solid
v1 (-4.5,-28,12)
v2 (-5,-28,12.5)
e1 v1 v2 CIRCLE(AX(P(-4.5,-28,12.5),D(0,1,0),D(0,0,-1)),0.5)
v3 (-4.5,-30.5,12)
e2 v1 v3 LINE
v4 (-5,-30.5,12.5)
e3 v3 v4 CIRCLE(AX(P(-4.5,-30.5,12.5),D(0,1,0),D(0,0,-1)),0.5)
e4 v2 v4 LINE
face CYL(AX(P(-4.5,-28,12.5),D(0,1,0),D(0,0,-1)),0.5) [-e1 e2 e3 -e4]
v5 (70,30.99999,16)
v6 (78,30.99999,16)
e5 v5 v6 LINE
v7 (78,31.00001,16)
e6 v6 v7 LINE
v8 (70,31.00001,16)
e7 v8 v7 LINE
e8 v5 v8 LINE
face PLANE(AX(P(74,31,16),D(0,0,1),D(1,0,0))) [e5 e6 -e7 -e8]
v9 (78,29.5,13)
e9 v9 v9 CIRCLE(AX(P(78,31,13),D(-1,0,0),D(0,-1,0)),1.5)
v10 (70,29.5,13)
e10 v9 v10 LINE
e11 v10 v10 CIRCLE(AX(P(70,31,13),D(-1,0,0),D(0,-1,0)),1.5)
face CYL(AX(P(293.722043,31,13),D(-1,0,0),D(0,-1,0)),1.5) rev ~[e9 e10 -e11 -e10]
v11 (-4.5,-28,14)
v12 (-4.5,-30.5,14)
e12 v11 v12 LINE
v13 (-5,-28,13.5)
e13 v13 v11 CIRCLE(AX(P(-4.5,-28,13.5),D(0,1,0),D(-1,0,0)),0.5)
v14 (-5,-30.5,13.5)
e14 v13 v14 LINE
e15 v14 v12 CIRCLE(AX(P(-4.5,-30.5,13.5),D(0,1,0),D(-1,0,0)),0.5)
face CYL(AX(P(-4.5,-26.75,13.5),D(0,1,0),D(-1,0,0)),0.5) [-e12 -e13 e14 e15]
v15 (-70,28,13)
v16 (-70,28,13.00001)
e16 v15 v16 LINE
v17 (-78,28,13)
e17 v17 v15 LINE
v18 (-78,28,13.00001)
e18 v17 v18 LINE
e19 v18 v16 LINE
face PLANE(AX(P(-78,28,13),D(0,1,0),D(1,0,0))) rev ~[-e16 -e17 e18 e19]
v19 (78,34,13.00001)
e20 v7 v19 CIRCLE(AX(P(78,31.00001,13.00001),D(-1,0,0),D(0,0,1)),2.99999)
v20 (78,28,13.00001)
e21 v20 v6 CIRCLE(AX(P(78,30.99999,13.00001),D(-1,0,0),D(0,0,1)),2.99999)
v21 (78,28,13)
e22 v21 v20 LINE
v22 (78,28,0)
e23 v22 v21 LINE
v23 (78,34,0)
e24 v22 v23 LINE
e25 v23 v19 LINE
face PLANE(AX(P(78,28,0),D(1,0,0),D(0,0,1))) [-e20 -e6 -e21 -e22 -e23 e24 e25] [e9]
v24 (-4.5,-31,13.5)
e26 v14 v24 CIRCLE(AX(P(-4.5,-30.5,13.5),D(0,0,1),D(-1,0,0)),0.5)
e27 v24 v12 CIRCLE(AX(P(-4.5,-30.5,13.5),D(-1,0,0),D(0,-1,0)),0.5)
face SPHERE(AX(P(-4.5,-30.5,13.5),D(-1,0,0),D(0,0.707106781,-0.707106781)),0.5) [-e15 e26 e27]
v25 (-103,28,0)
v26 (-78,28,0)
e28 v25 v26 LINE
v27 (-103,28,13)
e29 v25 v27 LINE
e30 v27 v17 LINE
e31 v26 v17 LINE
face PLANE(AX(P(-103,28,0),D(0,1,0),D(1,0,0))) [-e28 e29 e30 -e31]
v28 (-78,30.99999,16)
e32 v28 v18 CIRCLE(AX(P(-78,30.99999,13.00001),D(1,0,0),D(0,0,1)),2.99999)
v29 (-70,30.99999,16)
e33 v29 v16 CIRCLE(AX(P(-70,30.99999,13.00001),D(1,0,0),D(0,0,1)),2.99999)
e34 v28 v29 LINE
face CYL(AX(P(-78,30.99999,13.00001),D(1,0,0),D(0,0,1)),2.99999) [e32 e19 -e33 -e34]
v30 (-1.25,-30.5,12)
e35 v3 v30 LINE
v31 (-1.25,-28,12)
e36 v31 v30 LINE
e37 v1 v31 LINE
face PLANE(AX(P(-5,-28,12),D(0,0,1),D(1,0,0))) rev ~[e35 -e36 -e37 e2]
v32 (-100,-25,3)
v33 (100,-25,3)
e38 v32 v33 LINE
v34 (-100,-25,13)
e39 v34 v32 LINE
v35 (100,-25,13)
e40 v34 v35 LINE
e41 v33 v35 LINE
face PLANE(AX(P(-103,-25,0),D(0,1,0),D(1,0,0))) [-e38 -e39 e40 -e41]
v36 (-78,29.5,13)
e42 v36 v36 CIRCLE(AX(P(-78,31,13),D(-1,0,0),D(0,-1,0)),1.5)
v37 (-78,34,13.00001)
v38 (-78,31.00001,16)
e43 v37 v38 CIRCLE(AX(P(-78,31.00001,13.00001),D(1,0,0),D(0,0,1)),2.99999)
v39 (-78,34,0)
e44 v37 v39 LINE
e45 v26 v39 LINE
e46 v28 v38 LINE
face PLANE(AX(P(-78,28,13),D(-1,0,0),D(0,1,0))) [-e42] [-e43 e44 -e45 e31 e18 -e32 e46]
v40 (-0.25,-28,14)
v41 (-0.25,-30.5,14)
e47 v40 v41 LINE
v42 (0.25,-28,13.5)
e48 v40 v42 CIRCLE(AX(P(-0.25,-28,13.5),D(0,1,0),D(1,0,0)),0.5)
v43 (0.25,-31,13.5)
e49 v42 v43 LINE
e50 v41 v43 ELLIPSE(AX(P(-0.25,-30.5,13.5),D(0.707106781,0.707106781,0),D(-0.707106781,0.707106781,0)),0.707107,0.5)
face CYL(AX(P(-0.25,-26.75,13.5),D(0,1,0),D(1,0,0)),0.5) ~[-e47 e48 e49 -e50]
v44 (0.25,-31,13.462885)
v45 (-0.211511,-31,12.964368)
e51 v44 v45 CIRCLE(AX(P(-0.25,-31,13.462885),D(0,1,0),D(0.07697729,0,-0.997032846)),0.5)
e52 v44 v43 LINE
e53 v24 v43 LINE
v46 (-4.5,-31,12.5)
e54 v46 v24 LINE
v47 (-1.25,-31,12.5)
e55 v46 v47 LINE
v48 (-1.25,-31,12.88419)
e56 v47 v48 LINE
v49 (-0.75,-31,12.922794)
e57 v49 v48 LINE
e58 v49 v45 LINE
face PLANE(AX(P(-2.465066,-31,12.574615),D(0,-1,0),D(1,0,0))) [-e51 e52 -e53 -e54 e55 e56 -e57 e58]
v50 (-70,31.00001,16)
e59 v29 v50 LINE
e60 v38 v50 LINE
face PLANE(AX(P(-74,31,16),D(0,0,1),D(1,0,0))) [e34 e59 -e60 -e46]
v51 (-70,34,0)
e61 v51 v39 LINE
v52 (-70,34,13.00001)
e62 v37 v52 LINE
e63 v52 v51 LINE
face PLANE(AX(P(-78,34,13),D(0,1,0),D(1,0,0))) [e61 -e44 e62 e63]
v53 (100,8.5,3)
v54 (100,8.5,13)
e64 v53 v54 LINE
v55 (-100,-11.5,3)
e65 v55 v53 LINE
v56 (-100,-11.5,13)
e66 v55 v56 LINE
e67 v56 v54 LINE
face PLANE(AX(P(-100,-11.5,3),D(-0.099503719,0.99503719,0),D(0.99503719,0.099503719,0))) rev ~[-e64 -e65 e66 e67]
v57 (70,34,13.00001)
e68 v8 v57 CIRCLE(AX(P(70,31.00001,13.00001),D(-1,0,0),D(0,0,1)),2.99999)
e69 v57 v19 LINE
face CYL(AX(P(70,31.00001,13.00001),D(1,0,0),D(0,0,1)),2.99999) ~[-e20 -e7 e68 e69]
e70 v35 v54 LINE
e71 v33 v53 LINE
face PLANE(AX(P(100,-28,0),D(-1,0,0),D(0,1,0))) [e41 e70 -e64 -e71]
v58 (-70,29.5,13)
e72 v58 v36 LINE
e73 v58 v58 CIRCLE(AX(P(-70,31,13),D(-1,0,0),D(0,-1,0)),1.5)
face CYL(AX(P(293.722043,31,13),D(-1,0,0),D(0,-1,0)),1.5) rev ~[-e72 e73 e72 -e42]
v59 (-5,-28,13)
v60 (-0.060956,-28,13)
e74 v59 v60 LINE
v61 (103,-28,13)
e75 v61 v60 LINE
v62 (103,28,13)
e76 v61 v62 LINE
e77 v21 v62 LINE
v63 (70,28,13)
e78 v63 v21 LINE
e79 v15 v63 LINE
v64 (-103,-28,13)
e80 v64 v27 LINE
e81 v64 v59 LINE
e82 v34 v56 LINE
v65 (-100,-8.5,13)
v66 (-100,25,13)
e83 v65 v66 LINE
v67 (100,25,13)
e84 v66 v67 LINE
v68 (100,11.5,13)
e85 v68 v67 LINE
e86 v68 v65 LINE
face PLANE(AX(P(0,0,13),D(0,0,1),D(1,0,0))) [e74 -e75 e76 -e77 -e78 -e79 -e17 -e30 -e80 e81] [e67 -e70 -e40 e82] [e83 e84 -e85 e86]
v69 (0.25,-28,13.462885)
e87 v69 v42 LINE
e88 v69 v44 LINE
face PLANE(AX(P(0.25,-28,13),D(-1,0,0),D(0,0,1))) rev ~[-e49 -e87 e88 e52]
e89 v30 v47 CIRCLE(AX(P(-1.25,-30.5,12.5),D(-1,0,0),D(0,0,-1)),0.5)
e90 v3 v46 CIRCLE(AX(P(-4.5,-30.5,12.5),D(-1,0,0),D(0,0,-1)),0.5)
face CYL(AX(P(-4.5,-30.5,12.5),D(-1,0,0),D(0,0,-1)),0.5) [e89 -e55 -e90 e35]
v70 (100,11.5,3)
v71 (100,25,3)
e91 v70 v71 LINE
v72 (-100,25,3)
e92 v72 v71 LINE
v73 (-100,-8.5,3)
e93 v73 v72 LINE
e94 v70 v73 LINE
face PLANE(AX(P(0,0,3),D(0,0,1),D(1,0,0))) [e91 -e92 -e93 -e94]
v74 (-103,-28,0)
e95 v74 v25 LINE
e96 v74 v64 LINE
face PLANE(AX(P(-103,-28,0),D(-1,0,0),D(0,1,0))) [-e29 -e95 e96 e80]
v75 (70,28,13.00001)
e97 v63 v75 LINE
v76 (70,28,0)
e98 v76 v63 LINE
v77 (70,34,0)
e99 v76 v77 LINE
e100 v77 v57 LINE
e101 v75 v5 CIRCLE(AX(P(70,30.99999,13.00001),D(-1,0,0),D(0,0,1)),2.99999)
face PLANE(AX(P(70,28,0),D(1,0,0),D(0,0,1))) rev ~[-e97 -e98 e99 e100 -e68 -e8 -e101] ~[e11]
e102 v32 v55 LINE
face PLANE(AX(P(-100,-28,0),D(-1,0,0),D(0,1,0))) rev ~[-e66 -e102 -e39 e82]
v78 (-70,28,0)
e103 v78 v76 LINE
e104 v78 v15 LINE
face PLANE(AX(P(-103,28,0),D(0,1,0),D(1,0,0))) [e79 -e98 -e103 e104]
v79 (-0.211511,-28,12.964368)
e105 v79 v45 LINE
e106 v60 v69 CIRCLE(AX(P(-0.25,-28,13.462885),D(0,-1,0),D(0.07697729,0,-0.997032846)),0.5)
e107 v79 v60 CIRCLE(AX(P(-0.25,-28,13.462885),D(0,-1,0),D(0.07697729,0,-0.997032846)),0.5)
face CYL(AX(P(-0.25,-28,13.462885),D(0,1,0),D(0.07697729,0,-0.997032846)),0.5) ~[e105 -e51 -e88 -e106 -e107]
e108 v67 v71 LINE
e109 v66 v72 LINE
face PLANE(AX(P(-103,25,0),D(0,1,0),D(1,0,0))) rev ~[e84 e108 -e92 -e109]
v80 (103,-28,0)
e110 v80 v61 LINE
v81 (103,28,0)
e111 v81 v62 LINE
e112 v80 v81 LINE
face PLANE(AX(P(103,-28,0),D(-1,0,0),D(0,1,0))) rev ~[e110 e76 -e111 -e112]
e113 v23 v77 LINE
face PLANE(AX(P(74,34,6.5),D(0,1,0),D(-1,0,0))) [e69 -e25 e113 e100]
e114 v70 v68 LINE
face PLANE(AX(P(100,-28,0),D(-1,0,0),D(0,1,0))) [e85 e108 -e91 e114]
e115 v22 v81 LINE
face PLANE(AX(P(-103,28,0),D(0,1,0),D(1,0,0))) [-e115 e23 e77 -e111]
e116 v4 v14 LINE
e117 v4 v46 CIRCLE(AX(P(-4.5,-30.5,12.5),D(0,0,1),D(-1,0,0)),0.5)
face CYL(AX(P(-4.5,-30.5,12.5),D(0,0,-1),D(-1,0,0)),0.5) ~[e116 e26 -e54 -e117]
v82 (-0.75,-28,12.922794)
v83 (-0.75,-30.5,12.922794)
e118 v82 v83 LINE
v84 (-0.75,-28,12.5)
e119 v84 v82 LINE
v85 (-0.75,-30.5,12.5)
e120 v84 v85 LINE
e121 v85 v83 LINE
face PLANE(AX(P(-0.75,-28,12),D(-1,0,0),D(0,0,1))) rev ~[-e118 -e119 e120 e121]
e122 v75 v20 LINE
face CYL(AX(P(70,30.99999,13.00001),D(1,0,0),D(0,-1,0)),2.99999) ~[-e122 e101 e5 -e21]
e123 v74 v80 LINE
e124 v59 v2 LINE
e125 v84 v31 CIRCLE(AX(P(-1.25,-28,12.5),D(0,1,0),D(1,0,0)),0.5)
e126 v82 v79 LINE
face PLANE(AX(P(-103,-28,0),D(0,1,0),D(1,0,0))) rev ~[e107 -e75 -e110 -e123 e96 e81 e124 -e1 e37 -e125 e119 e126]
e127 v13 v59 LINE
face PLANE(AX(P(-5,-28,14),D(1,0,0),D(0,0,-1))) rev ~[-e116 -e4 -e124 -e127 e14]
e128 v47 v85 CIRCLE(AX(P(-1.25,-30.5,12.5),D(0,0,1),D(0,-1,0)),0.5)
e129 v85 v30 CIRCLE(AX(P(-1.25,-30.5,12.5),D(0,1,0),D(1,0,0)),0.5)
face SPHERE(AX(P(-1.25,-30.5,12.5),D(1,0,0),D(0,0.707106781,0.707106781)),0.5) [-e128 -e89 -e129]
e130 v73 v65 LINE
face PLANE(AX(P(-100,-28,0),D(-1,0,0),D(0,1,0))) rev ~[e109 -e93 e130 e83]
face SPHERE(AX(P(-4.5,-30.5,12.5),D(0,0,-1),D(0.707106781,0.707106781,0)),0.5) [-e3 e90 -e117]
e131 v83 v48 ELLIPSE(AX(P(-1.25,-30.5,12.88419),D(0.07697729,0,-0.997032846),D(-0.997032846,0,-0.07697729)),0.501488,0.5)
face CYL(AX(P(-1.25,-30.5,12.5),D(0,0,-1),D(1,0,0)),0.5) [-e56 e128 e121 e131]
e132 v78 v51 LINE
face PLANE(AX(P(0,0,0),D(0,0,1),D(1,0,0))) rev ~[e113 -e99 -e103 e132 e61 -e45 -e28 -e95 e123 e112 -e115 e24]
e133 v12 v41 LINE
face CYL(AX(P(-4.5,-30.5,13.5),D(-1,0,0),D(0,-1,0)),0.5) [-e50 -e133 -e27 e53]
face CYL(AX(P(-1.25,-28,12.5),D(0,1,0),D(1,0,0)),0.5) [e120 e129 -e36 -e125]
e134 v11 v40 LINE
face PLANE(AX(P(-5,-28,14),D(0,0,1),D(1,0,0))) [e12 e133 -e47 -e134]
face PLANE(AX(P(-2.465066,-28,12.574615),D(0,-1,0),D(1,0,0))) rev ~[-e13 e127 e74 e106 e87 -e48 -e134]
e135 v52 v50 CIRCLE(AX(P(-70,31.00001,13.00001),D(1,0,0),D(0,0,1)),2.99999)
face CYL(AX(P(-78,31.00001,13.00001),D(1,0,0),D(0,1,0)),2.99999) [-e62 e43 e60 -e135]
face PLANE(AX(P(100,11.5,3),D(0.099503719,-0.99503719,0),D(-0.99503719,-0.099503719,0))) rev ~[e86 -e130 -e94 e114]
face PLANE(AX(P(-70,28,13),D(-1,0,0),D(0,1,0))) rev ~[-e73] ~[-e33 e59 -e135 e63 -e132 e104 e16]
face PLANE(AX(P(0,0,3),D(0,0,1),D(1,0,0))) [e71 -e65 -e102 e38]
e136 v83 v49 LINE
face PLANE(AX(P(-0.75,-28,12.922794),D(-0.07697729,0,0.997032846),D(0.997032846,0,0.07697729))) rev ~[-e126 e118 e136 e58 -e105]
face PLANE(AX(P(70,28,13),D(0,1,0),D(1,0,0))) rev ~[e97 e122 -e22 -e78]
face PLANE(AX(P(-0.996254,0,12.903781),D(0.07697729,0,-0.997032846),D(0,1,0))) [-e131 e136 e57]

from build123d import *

# Parameters (mm, degrees)
F0_W          = 206
F0_H          = 56
F1_DEPTH      = 13
F2_T          = -3
F4_DEPTH      = 10
F5_W          = 8
F5_H          = 13
F6_DEPTH      = 6
F7_W          = 8
F7_H          = 6
F8_DEPTH      = 3
F9_R          = 2.99999
F11_D         = 3
F12_W         = 5.25
F12_H         = 1
F13_DEPTH     = 3
F14_T1_DEPTH  = 5.5
F14_T3_DEPTH  = 4.1572120132
F14_T5_DEPTH  = 3.75
F14_T7_DEPTH  = 6
F14_T9_DEPTH  = 3.25
F14_T11_DEPTH = 2.5
F14_T13_DEPTH = 1
F14_S17_W     = 0.5
F14_S17_H     = 0.5
F14_T18_DEPTH = 0.5
F14_S23_W     = 0.5
F14_S23_H     = 0.5
F14_T24_DEPTH = 0.5
F14_S29_W     = 0.5
F14_S29_H     = 0.5
F14_T30_DEPTH = 0.5
F14_T36_DEPTH = 1.6727936268


# Not quite as in the source:
# - a fillet or chamfer that OpenCascade refuses, or shapes differently, is made with other operations: its cross-section is extruded or revolved along the edge and cut away or added
# - a fillet or chamfer is up to 0.001 mm smaller than in the source, because OpenCascade refuses the exact size


with BuildPart() as f1:
    # F0 (on Top) → F1 (new body)
    with BuildSketch(Plane.XY):
        Rectangle(F0_W, F0_H)
    extrude(amount=F1_DEPTH)

    # F2
    f2_openings = [f1.faces().sort_by_distance(p)[0] for p in [
        (0, 0, 13),
    ]]
    offset(amount=F2_T, openings=f2_openings)

    # F3 (on face) → F4 (join)
    with BuildSketch(Plane.XY.offset(3)):
        Polygon((100, 11.5), (-100, -8.5), (-100, -11.5), (100, 8.5), align=None)
    extrude(amount=F4_DEPTH)

    # F5 (on face) → F6 (join)
    with BuildSketch(Plane(origin=(0, 28, 0), x_dir=(-1, 0, 0), z_dir=(0, 1, 0))):
        with Locations((-74, 6.5)):
            Rectangle(F5_W, F5_H)
        with Locations((74, 6.5)):
            Rectangle(F5_W, F5_H)
    extrude(amount=F6_DEPTH)

    # F7 (on face) → F8 (join)
    with BuildSketch(Plane.XY.offset(13)):
        with Locations((-74, 31)):
            Rectangle(F7_W, F7_H)
        with Locations((74, 31)):
            Rectangle(F7_W, F7_H)
    extrude(amount=F8_DEPTH)

    # F9 (radius 3 in the source; OpenCascade refuses exactly that, so slightly less here)
    f9_edges = [f1.edges().sort_by_distance(p)[0] for p in [
        (-74, 28, 16),
        (-74, 34, 16),
        (74, 34, 16),
        (74, 28, 16),
    ]]
    fillet(f9_edges, radius=F9_R)

    # F11 (through all)
    with Locations(Plane.YZ.offset(78)):
        with Locations((31, 13)):
            Hole(F11_D / 2)

    # F12 (on face) → F13 (join)
    with BuildSketch(Plane.XZ.offset(28)):
        Polygon((-0.75, 12.9227936268), (0.25, 13), (-5, 13), (-5, 12), (-0.75, 12), align=None)
        with Locations((-2.375, 13.5)):
            Rectangle(F12_W, F12_H)
    extrude(amount=F13_DEPTH)

    # F14: fillet of radius 0.5 on 9 edges, made by hand

    # F14_s2 → F14_t1 (cut)
    with BuildSketch(Plane.XZ.offset(26.75)):
        with BuildLine():
            ThreePointArc((0.25, 13.5), (0.1035533906, 13.8535533906), (-0.25, 14))
            Line((-0.25, 14), (0.25, 14))
            Line((0.25, 14), (0.25, 13.5))
        make_face()
    extrude(amount=F14_T1_DEPTH, mode=Mode.SUBTRACT)

    # F14_s4 → F14_t3 (cut)
    with BuildSketch(Plane.XZ.offset(28)):
        with BuildLine():
            ThreePointArc((-0.211511355, 12.9643683821), (0.1169089277, 13.1232116701), (0.25, 13.4628848053))
            Line((0.25, 13.4628848053), (0.25, 13))
            Line((0.25, 13), (-0.211511355, 12.9643683821))
        make_face()
    extrude(amount=F14_T3_DEPTH, mode=Mode.SUBTRACT)

    # F14_s6 → F14_t5 (cut)
    with BuildSketch(Plane.XZ.offset(26.75)):
        with BuildLine():
            ThreePointArc((-5, 13.5), (-4.8535533906, 13.8535533906), (-4.5, 14))
            Line((-4.5, 14), (-5, 14))
            Line((-5, 14), (-5, 13.5))
        make_face()
    extrude(amount=F14_T5_DEPTH, mode=Mode.SUBTRACT)

    # F14_s8 → F14_t7 (cut)
    with BuildSketch(Plane.YZ.offset(-4.5)):
        with BuildLine():
            ThreePointArc((-31, 13.5), (-30.8535533906, 13.8535533906), (-30.5, 14))
            Line((-30.5, 14), (-31, 14))
            Line((-31, 14), (-31, 13.5))
        make_face()
    extrude(amount=F14_T7_DEPTH, mode=Mode.SUBTRACT)

    # F14_s10 → F14_t9 (cut)
    with BuildSketch(Plane.YZ.offset(-4.5)):
        with BuildLine():
            ThreePointArc((-30.5, 12), (-30.8535533906, 12.1464466094), (-31, 12.5))
            Line((-31, 12.5), (-31, 12))
            Line((-31, 12), (-30.5, 12))
        make_face()
    extrude(amount=F14_T9_DEPTH, mode=Mode.SUBTRACT)

    # F14_s12 → F14_t11 (cut)
    with BuildSketch(Plane.XZ.offset(28)):
        with BuildLine():
            ThreePointArc((-0.75, 12.5), (-0.8964466094, 12.1464466094), (-1.25, 12))
            Line((-1.25, 12), (-0.75, 12))
            Line((-0.75, 12), (-0.75, 12.5))
        make_face()
        with BuildLine():
            ThreePointArc((-4.5, 12), (-4.8535533906, 12.1464466094), (-5, 12.5))
            Line((-5, 12.5), (-5, 12))
            Line((-5, 12), (-4.5, 12))
        make_face()
    extrude(amount=F14_T11_DEPTH, mode=Mode.SUBTRACT)

    # F14_s14 → F14_t13 (cut)
    with BuildSketch(Plane.XY.offset(12.5)):
        with BuildLine():
            ThreePointArc((-5, -30.5), (-4.8535533906, -30.8535533906), (-4.5, -31))
            Line((-4.5, -31), (-5, -31))
            Line((-5, -31), (-5, -30.5))
        make_face()
    extrude(amount=F14_T13_DEPTH, mode=Mode.SUBTRACT)


with BuildPart() as f14_tool16:
    # F14_s17 → F14_t18 (new body)
    with BuildSketch(Plane.YZ.offset(-4.5)):
        with Locations((-30.75, 13.75)):
            Rectangle(F14_S17_W, F14_S17_H)
    extrude(amount=-F14_T18_DEPTH)

    # F14_s19 → F14_t20 (revolve, cut)
    with BuildSketch(Plane(origin=(-4.5, -30.5, 13.5), x_dir=(0, 0.7071067812, -0.7071067812), z_dir=(0, 0.7071067812, 0.7071067812))):
        with BuildLine():
            ThreePointArc((0, -0.5), (0.5, 0), (0, 0.5))
            Line((0, 0.5), (0, -0.5))
        make_face()
    revolve(axis=Axis((-4.5, -30.5, 13.5), (-1, 0, 0)), mode=Mode.SUBTRACT)


with BuildPart() as f1_1:
    add(f1.part)

    # F14_t15: cut F14_tool16
    add(f14_tool16.part, mode=Mode.SUBTRACT)


with BuildPart() as f14_tool22:
    # F14_s23 → F14_t24 (new body)
    with BuildSketch(Plane.XY.offset(12.5)):
        with Locations((-4.75, -30.75)):
            Rectangle(F14_S23_W, F14_S23_H)
    extrude(amount=-F14_T24_DEPTH)

    # F14_s25 → F14_t26 (revolve, cut)
    with BuildSketch(Plane(origin=(-4.5, -30.5, 12.5), x_dir=(0.7071067812, 0.7071067812, 0), z_dir=(-0.7071067812, 0.7071067812, 0))):
        with BuildLine():
            ThreePointArc((0, -0.5), (0.5, 0), (0, 0.5))
            Line((0, 0.5), (0, -0.5))
        make_face()
    revolve(axis=Axis((-4.5, -30.5, 12.5), (0, 0, -1)), mode=Mode.SUBTRACT)


with BuildPart() as f1_2:
    add(f1_1.part)

    # F14_t21: cut F14_tool22
    add(f14_tool22.part, mode=Mode.SUBTRACT)


with BuildPart() as f14_tool28:
    # F14_s29 → F14_t30 (new body)
    with BuildSketch(Plane.YZ.offset(-1.25)):
        with Locations((-30.75, 12.25)):
            Rectangle(F14_S29_W, F14_S29_H)
    extrude(amount=F14_T30_DEPTH)

    # F14_s31 → F14_t32 (revolve, cut)
    with BuildSketch(Plane(origin=(-1.25, -30.5, 12.5), x_dir=(0, 0.7071067812, 0.7071067812), z_dir=(0, 0.7071067812, -0.7071067812))):
        with BuildLine():
            ThreePointArc((0, -0.5), (0.5, 0), (0, 0.5))
            Line((0, 0.5), (0, -0.5))
        make_face()
    revolve(axis=Axis((-1.25, -30.5, 12.5), (1, 0, 0)), mode=Mode.SUBTRACT)


with BuildPart() as f1_3:
    add(f1_2.part)

    # F14_t27: cut F14_tool28
    add(f14_tool28.part, mode=Mode.SUBTRACT)


with BuildPart() as f14_tool34:
    # F14_s35 → F14_t36 (new body)
    with BuildSketch(Plane.XY.offset(12.5)):
        with BuildLine():
            ThreePointArc((-0.75, -30.5), (-0.8964466094, -30.8535533906), (-1.25, -31))
            Line((-1.25, -31), (-0.75, -31))
            Line((-0.75, -31), (-0.75, -30.5))
        make_face()
    extrude(amount=F14_T36_DEPTH)

    split(bisect_by=Plane(origin=(-0.9962541501, 0, 12.903781237), x_dir=(0, 1, 0), z_dir=(0.07697729, 0, -0.9970328464)), keep=Keep.TOP)


with BuildPart() as f1_4:
    add(f1_3.part)

    # F14_t33: cut F14_tool34
    add(f14_tool34.part, mode=Mode.SUBTRACT)


solid = f1_4.part
